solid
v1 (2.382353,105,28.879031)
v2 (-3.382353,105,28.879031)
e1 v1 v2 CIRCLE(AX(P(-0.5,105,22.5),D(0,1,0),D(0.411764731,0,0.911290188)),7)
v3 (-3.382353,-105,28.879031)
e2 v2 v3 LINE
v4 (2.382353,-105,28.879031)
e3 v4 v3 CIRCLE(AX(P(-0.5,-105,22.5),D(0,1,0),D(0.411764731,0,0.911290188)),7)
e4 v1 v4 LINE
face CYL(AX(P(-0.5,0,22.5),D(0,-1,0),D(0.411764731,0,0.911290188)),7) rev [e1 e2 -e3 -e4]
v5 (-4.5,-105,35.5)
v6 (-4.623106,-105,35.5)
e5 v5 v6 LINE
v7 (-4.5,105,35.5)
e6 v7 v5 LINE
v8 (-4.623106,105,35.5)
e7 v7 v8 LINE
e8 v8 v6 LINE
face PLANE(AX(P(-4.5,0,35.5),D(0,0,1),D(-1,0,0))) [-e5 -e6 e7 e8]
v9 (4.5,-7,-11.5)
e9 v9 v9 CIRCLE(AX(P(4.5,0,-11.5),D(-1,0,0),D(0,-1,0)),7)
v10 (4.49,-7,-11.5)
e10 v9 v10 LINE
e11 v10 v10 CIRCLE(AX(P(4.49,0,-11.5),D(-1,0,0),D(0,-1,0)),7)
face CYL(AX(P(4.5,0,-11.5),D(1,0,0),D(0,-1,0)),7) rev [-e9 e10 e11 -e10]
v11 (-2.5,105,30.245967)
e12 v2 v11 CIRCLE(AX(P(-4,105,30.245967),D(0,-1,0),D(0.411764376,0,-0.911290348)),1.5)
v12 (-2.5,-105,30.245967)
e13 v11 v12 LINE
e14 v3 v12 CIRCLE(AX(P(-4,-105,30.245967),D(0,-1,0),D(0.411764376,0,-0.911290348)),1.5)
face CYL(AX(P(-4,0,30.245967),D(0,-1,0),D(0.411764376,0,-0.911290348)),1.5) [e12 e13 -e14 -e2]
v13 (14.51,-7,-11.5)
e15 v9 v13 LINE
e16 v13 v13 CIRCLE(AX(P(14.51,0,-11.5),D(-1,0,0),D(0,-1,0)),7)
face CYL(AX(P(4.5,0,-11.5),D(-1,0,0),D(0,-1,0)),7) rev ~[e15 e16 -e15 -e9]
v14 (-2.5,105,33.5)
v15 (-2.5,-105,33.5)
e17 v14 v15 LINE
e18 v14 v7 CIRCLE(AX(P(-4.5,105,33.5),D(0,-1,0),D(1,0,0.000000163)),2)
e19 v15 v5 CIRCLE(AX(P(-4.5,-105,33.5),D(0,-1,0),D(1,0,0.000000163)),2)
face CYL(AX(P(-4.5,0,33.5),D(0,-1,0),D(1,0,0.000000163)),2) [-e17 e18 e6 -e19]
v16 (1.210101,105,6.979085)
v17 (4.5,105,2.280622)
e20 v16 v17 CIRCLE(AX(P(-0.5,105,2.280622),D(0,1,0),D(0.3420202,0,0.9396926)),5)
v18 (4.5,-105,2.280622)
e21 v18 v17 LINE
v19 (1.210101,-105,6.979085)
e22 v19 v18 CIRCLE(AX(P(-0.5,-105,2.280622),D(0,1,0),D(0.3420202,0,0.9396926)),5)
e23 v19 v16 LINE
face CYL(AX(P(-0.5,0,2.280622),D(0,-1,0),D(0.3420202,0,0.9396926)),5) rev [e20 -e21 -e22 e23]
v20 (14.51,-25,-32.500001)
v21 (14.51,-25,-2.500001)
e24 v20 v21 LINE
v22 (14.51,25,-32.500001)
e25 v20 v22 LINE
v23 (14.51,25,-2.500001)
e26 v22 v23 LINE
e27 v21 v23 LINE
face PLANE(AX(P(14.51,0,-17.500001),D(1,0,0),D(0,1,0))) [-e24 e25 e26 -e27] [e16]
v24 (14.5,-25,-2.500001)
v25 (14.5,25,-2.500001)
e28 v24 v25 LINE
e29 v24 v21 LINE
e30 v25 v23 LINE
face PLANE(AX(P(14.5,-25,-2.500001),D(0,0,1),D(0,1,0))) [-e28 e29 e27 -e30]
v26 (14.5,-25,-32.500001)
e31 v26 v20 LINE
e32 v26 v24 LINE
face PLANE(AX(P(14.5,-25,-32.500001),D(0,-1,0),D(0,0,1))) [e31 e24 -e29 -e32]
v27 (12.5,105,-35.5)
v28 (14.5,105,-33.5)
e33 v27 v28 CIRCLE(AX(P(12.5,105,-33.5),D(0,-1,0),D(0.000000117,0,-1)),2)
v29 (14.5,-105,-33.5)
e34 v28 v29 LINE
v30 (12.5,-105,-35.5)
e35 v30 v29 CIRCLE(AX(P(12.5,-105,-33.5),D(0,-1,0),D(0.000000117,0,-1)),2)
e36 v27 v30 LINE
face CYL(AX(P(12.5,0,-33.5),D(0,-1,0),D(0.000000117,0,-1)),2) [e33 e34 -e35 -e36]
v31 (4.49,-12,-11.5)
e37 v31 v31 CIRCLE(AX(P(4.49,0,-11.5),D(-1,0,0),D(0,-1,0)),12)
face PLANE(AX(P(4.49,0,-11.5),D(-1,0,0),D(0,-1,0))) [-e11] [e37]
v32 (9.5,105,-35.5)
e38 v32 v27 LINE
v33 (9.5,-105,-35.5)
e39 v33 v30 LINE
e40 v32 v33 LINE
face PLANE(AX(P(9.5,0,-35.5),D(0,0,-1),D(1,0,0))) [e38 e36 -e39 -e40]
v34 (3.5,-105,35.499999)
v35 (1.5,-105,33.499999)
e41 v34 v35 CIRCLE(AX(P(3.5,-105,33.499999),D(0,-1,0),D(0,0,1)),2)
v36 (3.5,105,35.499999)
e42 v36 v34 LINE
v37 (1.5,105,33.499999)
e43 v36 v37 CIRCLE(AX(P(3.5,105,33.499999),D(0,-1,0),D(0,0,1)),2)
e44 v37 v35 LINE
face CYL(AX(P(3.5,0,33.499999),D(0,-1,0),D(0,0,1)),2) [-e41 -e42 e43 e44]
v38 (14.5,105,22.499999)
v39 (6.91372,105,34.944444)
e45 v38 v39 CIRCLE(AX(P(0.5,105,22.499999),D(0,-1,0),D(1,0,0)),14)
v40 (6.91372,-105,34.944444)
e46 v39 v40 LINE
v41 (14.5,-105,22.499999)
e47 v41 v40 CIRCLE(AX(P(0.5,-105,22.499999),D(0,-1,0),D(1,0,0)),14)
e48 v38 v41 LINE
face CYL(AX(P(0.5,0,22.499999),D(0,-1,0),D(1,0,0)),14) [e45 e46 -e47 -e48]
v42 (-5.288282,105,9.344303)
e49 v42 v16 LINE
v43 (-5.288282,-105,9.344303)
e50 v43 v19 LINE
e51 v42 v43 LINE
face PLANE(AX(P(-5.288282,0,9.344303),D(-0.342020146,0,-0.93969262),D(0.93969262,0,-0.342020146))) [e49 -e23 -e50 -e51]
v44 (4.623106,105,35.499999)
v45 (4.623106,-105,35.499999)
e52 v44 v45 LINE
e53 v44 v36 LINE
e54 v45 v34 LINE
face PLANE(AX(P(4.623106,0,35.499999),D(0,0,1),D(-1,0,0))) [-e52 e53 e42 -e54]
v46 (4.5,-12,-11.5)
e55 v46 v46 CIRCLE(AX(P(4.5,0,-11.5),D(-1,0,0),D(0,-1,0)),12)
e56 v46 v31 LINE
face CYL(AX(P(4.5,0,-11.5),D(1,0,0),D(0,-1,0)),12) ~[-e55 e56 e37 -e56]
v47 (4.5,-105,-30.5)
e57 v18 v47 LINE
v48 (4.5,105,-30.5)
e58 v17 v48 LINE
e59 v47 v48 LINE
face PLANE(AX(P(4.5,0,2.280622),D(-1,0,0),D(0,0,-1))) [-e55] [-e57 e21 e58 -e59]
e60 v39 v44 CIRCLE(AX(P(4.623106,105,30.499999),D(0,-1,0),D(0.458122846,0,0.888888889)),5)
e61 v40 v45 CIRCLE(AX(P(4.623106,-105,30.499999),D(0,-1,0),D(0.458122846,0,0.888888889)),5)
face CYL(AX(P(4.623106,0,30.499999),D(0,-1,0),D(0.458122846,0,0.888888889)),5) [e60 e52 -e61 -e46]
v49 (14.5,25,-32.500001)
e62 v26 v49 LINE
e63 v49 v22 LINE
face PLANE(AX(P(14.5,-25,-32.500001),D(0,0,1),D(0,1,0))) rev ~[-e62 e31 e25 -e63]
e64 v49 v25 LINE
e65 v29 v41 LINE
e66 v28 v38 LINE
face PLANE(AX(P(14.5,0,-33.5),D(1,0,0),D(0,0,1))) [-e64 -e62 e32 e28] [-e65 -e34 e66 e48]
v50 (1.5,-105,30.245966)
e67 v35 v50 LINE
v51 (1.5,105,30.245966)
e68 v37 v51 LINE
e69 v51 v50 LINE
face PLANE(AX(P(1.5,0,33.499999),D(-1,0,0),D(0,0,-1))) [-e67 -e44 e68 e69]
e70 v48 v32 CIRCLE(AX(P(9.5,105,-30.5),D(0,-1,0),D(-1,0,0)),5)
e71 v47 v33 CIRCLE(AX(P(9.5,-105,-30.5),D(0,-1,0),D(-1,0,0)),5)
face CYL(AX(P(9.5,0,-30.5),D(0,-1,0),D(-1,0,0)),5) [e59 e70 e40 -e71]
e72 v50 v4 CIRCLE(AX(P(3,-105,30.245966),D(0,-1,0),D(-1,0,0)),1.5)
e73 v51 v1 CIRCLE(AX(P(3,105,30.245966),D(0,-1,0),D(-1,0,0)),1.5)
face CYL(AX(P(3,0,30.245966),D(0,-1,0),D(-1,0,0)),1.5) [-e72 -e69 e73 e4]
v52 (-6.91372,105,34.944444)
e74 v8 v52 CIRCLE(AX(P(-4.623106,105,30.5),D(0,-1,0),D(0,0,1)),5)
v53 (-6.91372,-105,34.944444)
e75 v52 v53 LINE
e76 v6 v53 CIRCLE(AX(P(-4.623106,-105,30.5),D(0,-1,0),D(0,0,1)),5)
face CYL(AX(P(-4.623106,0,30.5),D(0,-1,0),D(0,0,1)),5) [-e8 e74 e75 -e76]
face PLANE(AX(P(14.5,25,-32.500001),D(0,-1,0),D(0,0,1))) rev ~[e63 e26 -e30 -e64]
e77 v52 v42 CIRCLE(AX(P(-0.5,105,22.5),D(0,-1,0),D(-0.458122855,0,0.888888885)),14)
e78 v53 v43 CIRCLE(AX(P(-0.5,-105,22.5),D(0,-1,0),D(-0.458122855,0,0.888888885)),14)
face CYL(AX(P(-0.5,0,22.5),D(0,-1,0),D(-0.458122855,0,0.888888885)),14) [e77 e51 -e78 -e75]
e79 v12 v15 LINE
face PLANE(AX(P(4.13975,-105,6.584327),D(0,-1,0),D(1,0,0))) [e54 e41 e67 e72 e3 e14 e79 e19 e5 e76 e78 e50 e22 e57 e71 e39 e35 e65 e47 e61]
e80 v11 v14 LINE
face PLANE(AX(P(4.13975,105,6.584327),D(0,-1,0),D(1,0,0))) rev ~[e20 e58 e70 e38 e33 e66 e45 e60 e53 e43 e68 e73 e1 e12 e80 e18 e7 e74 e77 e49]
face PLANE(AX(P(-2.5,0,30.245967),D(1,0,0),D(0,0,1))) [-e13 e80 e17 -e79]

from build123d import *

# Parameters (mm, degrees)
F1_DEPTH = 105
F2_R     = 12
F2_R_2   = 7
F3_DEPTH = 0.01
F4_W     = 50
F4_H     = 30
F5_DEPTH = 0.01
F6_DEPTH = 20


# Not quite as in the source:
# - ends of sketch curves that miss each other by under 0.0002 mm in the source are joined


with BuildPart() as f1:
    # F0 (on Front) → F1 (new body, symmetric)
    with BuildSketch(Plane.XZ):
        with BuildLine():
            Line((4.4999999997, -23.5), (4.4999999997, -30.5))
            ThreePointArc((4.4999999997, -30.5), (5.9644660938, -34.0355339059), (9.4999999997, -35.5))
            Line((9.4999999997, -35.5), (12.5, -35.5))
            ThreePointArc((12.5, -35.5), (13.9142133287, -34.9142135624), (14.4999997663, -33.5))
            Line((14.4999997663, -33.5), (14.4999997663, 22.4999994828))
            ThreePointArc((14.4999997663, 22.4999994828), (12.4539129776, 29.7872458033), (6.9137199183, 34.9444437777))
            ThreePointArc((6.9137199183, 34.9444437777), (5.8016169865, 35.3591259101), (4.6231056877, 35.4999993303))
            Line((4.6231056877, 35.4999993303), (3.4999997663, 35.4999993303))
            ThreePointArc((3.4999997663, 35.4999993303), (2.0857862039, 34.9142128927), (1.4999997663, 33.4999993303))
            Line((1.4999997663, 33.4999993303), (1.4999997663, 30.2459664828))
            ThreePointArc((1.4999997663, 30.2459664828), (1.7397477835, 29.4324771221), (2.3823530195, 28.8790310431))
            ThreePointArc((2.3823530195, 28.8790310431), (-0.5000000985, 15.4999997293), (-3.3823532363, 28.8790310342))
            ThreePointArc((-3.3823532363, 28.8790310342), (-2.7397478169, 29.4324771961), (-2.4999997997, 30.2459665567))
            Line((-2.4999997997, 30.2459665567), (-2.4999997997, 33.5))
            ThreePointArc((-2.4999997997, 33.5), (-3.0857862373, 34.9142132361), (-4.4999997997, 35.4999996738))
            Line((-4.4999997997, 35.4999996738), (-4.6231058319, 35.4999996738))
            ThreePointArc((-4.6231058319, 35.4999996738), (-5.8016171306, 35.3591262536), (-6.9137200625, 34.9444441212))
            ThreePointArc((-6.9137200625, 34.9444441212), (-14.4718653147, 21.6128794539), (-5.288282, 9.344303))
            Line((-5.288282, 9.344303), (1.210101, 6.979085))
            ThreePointArc((1.210101, 6.979085), (3.5957603078, 5.1485040574), (4.4999999997, 2.2806219993))
            Line((4.4999999997, 2.2806219993), (4.4999999997, 0.5))
            Line((4.4999999997, 0.5), (4.4999999997, -23.5))
        make_face()
    extrude(amount=F1_DEPTH, both=True)

    # F2 (on face) → F3 (join)
    with BuildSketch(Plane(origin=(4.4999999997, 0, 0), x_dir=(0, -1, 0), z_dir=(-1, 0, 0))):
        with Locations((0, -11.5)):
            Circle(F2_R)
        with Locations((0, -11.5)):
            Circle(F2_R_2, mode=Mode.SUBTRACT)
    extrude(amount=F3_DEPTH)

    # F4 (on face) → F5 (join)
    with BuildSketch(Plane.YZ.offset(14.4999997663)):
        with Locations((0, -17.5000005172)):
            Rectangle(F4_W, F4_H)
    extrude(amount=F5_DEPTH)

    # F6 (cut): a face of the model
    f6_faces = [f1.faces().sort_by_distance(p)[0] for p in [
        (4.4999999997, 0, -11.5),
    ]]
    extrude(f6_faces, amount=-F6_DEPTH, mode=Mode.SUBTRACT)


solid = f1.part
